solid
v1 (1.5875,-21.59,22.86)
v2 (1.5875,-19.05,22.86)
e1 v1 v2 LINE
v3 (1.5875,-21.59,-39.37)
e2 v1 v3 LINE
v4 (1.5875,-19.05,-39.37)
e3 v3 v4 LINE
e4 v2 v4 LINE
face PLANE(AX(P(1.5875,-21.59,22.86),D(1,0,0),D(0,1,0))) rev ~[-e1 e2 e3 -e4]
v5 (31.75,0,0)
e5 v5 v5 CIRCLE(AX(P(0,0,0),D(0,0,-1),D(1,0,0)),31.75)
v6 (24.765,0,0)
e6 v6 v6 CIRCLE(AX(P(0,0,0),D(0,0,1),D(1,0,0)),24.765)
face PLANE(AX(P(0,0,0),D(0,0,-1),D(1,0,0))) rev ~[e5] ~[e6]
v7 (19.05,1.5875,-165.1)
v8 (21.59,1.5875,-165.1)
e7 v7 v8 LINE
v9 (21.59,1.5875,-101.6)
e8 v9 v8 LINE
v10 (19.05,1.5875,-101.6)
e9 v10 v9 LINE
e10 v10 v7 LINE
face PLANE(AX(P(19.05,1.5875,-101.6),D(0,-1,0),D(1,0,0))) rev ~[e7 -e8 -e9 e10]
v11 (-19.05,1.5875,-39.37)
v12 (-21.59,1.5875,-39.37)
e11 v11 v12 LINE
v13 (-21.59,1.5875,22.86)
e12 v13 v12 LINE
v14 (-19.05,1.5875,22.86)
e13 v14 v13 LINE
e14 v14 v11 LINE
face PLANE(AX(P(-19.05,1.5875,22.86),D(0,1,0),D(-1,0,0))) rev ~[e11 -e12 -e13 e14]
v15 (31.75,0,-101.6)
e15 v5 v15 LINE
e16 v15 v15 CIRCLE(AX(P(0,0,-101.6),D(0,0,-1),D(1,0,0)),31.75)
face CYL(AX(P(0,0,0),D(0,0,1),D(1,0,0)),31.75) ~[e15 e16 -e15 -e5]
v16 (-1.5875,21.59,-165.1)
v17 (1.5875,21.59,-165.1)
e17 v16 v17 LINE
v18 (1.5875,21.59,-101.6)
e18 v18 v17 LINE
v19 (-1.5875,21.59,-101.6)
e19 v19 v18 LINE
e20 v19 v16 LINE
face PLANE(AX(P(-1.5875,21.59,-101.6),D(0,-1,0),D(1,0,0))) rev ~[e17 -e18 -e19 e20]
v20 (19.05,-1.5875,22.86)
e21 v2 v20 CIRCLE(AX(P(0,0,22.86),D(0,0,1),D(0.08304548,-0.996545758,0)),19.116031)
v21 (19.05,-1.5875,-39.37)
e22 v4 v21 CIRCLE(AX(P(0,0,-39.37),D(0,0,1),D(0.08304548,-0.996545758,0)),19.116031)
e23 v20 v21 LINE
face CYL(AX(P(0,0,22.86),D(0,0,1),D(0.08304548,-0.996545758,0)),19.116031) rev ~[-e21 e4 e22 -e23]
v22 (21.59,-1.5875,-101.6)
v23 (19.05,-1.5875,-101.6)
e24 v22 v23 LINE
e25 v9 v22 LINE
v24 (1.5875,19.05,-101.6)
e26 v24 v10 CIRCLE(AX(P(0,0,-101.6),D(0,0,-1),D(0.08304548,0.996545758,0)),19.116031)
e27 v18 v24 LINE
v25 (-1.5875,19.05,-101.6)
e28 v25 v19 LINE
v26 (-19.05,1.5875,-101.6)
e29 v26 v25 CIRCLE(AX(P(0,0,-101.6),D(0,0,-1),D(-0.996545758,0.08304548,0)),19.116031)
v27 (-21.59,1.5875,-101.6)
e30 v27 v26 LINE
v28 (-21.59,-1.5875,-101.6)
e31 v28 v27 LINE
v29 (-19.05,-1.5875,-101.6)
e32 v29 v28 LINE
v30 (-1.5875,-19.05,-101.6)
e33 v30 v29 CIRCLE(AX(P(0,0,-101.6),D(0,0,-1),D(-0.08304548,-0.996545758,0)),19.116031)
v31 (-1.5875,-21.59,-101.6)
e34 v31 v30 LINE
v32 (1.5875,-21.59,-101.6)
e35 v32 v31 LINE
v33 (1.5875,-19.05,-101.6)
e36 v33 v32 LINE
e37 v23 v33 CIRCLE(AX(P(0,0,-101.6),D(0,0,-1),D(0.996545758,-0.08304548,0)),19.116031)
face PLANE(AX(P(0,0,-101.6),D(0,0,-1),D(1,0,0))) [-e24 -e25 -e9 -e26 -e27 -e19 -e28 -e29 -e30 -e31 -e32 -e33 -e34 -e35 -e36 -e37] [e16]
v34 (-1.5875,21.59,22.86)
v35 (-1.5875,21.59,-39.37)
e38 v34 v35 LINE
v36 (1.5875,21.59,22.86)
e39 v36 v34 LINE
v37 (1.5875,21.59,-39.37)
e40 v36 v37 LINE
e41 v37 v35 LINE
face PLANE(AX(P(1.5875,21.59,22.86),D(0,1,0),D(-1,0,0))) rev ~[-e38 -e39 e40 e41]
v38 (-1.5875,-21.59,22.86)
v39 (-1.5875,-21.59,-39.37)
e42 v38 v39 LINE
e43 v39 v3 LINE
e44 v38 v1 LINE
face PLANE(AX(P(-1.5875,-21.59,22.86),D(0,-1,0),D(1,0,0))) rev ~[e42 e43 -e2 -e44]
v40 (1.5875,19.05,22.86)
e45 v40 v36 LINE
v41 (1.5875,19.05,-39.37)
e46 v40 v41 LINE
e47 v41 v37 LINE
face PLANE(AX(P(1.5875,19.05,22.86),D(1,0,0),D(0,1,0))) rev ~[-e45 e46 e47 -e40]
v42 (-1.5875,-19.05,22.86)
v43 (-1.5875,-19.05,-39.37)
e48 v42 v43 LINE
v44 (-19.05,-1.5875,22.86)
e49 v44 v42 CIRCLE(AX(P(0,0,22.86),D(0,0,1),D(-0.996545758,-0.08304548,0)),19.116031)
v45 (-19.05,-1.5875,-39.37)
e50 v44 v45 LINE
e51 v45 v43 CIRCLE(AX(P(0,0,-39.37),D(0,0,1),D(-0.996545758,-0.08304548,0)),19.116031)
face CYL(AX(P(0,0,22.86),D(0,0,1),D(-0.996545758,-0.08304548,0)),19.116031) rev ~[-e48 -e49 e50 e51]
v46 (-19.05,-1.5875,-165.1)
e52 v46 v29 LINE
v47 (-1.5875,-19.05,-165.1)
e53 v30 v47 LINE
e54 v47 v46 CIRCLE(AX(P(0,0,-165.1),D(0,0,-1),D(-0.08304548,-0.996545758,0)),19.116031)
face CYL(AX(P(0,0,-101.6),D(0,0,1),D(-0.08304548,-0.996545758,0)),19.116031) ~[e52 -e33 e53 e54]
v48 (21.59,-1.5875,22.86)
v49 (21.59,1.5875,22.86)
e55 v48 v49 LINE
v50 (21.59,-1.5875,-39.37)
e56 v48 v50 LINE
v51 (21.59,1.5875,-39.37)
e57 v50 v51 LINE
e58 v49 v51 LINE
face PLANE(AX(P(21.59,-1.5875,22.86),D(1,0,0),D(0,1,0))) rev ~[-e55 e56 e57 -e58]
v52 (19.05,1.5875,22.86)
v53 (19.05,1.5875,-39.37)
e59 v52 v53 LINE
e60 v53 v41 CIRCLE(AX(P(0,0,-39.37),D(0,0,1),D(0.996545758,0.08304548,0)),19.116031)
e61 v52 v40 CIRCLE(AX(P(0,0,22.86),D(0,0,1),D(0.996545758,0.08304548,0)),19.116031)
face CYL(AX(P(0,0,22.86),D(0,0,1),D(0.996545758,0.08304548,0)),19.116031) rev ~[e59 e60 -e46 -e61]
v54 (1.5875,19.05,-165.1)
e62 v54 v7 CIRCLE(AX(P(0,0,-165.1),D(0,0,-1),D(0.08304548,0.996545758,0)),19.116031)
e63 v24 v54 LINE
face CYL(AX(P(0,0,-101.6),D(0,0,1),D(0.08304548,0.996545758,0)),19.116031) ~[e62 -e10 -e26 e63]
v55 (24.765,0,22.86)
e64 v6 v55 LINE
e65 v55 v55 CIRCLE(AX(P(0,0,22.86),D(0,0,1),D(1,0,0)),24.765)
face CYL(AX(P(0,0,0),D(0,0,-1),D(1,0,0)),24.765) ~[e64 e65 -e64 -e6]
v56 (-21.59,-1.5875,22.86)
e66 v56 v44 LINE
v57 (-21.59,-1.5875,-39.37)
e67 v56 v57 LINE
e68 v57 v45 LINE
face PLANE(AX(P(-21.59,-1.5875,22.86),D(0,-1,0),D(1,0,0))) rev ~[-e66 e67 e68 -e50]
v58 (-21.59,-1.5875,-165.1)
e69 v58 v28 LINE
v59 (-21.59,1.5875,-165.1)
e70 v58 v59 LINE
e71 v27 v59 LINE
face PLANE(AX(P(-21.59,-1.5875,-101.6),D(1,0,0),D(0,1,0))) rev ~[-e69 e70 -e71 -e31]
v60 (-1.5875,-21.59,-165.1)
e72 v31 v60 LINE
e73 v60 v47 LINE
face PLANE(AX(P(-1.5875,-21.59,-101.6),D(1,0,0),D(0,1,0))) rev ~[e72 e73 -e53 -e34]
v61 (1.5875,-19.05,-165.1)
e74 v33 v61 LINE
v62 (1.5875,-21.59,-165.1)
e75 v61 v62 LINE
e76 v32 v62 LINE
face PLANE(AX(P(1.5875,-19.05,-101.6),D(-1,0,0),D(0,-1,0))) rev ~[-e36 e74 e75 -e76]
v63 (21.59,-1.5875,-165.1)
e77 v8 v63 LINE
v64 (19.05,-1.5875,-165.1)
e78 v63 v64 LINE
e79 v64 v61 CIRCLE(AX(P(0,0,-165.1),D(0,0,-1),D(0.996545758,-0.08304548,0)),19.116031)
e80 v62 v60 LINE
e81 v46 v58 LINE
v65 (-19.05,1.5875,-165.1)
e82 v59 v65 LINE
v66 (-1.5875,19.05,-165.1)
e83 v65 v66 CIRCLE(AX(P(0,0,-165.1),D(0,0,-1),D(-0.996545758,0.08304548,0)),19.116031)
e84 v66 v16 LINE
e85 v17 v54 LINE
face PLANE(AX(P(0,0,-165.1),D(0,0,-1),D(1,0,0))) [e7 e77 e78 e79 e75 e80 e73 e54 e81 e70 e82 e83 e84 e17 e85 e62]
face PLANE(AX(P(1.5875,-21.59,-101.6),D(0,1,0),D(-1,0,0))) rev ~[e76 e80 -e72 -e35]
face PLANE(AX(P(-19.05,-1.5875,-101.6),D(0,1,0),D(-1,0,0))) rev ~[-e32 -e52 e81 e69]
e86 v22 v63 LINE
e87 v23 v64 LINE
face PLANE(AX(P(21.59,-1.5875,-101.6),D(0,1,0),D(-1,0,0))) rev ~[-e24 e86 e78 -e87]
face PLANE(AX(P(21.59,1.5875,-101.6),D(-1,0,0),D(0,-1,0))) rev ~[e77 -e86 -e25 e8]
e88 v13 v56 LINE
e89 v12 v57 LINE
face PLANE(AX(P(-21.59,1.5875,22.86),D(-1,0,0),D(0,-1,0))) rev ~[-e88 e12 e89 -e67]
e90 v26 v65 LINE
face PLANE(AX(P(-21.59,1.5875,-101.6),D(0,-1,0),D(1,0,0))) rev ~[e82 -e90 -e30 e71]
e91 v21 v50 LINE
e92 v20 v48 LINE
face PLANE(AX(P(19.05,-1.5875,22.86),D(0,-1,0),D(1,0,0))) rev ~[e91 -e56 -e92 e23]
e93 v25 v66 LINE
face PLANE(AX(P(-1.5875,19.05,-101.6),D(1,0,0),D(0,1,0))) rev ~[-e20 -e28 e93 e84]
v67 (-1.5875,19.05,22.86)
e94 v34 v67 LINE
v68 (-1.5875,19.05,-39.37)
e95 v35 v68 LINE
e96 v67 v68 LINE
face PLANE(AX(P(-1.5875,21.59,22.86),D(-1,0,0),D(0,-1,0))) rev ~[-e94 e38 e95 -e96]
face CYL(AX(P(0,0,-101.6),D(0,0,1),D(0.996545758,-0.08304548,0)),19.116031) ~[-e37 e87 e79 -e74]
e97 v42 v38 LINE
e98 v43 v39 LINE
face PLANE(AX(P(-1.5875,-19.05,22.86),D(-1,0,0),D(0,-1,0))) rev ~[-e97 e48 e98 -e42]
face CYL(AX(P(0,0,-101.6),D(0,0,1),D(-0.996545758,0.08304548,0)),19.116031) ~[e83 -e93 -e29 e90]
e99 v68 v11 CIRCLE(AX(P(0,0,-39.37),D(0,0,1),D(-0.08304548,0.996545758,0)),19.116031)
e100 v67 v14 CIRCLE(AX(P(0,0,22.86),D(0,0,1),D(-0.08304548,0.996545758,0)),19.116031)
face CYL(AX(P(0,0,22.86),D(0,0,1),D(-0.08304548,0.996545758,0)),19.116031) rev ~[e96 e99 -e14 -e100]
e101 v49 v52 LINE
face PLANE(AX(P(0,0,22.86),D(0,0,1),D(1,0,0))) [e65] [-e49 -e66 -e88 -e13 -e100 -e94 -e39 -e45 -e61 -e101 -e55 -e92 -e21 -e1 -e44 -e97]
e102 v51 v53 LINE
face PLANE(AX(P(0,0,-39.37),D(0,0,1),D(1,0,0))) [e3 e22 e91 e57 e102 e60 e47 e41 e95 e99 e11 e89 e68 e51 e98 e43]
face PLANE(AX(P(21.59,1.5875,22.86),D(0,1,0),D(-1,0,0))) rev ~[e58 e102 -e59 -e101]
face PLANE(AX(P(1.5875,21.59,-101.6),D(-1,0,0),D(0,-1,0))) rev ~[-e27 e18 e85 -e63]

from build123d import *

# Parameters (mm, degrees)
F0_R     = 24.765
F1_DEPTH = 22.86
F2_R     = 31.75
F2_R_2   = 24.765
F3_DEPTH = 101.6
F6_DEPTH = 62.23
F7_DEPTH = 63.5


# Not quite as in the source:
# - a pattern or mirror of a feature is missing from the dataset's text; its kind, count and spacing are read off the source's solid


with BuildPart() as f1:
    # F0 (on Top) → F1 (new body)
    with BuildSketch(Plane.XY):
        Circle(F0_R)
    extrude(amount=F1_DEPTH)

    # F2 (on face) → F3 (join)
    with BuildSketch(Plane(origin=(0, 0, 0), x_dir=(1, 0, 0), z_dir=(0, 0, -1))):
        Circle(F2_R)
        Circle(F2_R_2, mode=Mode.SUBTRACT)
        Circle(F2_R_2)
    extrude(amount=F3_DEPTH)

    # F5 (on face) → F6 (cut)
    with BuildSketch(Plane.XY.offset(22.86)):
        with BuildLine():
            Line((-21.59, 1.5875), (-21.59, 0))
            Line((-21.59, 0), (-21.59, -1.5875))
            Line((-21.59, -1.5875), (-19.05, -1.5875))
            ThreePointArc((-19.05, -1.5875), (-13.517075428, -13.517075428), (-1.5875, -19.05))
            Line((-1.5875, -19.05), (-1.5875, -21.59))
            Line((-1.5875, -21.59), (1.5875, -21.59))
            Line((1.5875, -21.59), (1.5875, -19.05))
            ThreePointArc((1.5875, -19.05), (13.517075428, -13.517075428), (19.05, -1.5875))
            Line((19.05, -1.5875), (21.59, -1.5875))
            Line((21.59, -1.5875), (21.59, 0))
            Line((21.59, 0), (21.59, 1.5875))
            Line((21.59, 1.5875), (19.05, 1.5875))
            ThreePointArc((19.05, 1.5875), (13.517075428, 13.517075428), (1.5875, 19.05))
            Line((1.5875, 19.05), (1.5875, 21.59))
            Line((1.5875, 21.59), (-1.5875, 21.59))
            Line((-1.5875, 21.59), (-1.5875, 19.05))
            ThreePointArc((-1.5875, 19.05), (-13.517075428, 13.517075428), (-19.05, 1.5875))
            Line((-19.05, 1.5875), (-21.59, 1.5875))
        make_face()
    extrude(amount=-F6_DEPTH, mode=Mode.SUBTRACT)

    # F4 (on face) → F7 (join)
    with BuildSketch(Plane(origin=(0, 0, -101.6), x_dir=(1, 0, 0), z_dir=(0, 0, -1))):
        with BuildLine():
            Line((-21.59, 1.5875), (-21.59, 0))
            Line((-21.59, 0), (-21.59, -1.5875))
            Line((-21.59, -1.5875), (-19.05, -1.5875))
            ThreePointArc((-19.05, -1.5875), (-13.517075428, -13.517075428), (-1.5875, -19.05))
            Line((-1.5875, -19.05), (-1.5875, -21.59))
            Line((-1.5875, -21.59), (1.5875, -21.59))
            Line((1.5875, -21.59), (1.5875, -19.05))
            ThreePointArc((1.5875, -19.05), (13.517075428, -13.517075428), (19.05, -1.5875))
            Line((19.05, -1.5875), (21.59, -1.5875))
            Line((21.59, -1.5875), (21.59, 0))
            Line((21.59, 0), (21.59, 1.5875))
            Line((21.59, 1.5875), (19.05, 1.5875))
            ThreePointArc((19.05, 1.5875), (13.517075428, 13.517075428), (1.5875, 19.05))
            Line((1.5875, 19.05), (1.5875, 21.59))
            Line((1.5875, 21.59), (-1.5875, 21.59))
            Line((-1.5875, 21.59), (-1.5875, 19.05))
            ThreePointArc((-1.5875, 19.05), (-13.517075428, 13.517075428), (-19.05, 1.5875))
            Line((-19.05, 1.5875), (-21.59, 1.5875))
        make_face()
    f7 = extrude(amount=F7_DEPTH)

    # F7_copies: F7 across plane
    add(f7.mirror(Plane.XY.offset(-102.235)))


solid = f1.part
